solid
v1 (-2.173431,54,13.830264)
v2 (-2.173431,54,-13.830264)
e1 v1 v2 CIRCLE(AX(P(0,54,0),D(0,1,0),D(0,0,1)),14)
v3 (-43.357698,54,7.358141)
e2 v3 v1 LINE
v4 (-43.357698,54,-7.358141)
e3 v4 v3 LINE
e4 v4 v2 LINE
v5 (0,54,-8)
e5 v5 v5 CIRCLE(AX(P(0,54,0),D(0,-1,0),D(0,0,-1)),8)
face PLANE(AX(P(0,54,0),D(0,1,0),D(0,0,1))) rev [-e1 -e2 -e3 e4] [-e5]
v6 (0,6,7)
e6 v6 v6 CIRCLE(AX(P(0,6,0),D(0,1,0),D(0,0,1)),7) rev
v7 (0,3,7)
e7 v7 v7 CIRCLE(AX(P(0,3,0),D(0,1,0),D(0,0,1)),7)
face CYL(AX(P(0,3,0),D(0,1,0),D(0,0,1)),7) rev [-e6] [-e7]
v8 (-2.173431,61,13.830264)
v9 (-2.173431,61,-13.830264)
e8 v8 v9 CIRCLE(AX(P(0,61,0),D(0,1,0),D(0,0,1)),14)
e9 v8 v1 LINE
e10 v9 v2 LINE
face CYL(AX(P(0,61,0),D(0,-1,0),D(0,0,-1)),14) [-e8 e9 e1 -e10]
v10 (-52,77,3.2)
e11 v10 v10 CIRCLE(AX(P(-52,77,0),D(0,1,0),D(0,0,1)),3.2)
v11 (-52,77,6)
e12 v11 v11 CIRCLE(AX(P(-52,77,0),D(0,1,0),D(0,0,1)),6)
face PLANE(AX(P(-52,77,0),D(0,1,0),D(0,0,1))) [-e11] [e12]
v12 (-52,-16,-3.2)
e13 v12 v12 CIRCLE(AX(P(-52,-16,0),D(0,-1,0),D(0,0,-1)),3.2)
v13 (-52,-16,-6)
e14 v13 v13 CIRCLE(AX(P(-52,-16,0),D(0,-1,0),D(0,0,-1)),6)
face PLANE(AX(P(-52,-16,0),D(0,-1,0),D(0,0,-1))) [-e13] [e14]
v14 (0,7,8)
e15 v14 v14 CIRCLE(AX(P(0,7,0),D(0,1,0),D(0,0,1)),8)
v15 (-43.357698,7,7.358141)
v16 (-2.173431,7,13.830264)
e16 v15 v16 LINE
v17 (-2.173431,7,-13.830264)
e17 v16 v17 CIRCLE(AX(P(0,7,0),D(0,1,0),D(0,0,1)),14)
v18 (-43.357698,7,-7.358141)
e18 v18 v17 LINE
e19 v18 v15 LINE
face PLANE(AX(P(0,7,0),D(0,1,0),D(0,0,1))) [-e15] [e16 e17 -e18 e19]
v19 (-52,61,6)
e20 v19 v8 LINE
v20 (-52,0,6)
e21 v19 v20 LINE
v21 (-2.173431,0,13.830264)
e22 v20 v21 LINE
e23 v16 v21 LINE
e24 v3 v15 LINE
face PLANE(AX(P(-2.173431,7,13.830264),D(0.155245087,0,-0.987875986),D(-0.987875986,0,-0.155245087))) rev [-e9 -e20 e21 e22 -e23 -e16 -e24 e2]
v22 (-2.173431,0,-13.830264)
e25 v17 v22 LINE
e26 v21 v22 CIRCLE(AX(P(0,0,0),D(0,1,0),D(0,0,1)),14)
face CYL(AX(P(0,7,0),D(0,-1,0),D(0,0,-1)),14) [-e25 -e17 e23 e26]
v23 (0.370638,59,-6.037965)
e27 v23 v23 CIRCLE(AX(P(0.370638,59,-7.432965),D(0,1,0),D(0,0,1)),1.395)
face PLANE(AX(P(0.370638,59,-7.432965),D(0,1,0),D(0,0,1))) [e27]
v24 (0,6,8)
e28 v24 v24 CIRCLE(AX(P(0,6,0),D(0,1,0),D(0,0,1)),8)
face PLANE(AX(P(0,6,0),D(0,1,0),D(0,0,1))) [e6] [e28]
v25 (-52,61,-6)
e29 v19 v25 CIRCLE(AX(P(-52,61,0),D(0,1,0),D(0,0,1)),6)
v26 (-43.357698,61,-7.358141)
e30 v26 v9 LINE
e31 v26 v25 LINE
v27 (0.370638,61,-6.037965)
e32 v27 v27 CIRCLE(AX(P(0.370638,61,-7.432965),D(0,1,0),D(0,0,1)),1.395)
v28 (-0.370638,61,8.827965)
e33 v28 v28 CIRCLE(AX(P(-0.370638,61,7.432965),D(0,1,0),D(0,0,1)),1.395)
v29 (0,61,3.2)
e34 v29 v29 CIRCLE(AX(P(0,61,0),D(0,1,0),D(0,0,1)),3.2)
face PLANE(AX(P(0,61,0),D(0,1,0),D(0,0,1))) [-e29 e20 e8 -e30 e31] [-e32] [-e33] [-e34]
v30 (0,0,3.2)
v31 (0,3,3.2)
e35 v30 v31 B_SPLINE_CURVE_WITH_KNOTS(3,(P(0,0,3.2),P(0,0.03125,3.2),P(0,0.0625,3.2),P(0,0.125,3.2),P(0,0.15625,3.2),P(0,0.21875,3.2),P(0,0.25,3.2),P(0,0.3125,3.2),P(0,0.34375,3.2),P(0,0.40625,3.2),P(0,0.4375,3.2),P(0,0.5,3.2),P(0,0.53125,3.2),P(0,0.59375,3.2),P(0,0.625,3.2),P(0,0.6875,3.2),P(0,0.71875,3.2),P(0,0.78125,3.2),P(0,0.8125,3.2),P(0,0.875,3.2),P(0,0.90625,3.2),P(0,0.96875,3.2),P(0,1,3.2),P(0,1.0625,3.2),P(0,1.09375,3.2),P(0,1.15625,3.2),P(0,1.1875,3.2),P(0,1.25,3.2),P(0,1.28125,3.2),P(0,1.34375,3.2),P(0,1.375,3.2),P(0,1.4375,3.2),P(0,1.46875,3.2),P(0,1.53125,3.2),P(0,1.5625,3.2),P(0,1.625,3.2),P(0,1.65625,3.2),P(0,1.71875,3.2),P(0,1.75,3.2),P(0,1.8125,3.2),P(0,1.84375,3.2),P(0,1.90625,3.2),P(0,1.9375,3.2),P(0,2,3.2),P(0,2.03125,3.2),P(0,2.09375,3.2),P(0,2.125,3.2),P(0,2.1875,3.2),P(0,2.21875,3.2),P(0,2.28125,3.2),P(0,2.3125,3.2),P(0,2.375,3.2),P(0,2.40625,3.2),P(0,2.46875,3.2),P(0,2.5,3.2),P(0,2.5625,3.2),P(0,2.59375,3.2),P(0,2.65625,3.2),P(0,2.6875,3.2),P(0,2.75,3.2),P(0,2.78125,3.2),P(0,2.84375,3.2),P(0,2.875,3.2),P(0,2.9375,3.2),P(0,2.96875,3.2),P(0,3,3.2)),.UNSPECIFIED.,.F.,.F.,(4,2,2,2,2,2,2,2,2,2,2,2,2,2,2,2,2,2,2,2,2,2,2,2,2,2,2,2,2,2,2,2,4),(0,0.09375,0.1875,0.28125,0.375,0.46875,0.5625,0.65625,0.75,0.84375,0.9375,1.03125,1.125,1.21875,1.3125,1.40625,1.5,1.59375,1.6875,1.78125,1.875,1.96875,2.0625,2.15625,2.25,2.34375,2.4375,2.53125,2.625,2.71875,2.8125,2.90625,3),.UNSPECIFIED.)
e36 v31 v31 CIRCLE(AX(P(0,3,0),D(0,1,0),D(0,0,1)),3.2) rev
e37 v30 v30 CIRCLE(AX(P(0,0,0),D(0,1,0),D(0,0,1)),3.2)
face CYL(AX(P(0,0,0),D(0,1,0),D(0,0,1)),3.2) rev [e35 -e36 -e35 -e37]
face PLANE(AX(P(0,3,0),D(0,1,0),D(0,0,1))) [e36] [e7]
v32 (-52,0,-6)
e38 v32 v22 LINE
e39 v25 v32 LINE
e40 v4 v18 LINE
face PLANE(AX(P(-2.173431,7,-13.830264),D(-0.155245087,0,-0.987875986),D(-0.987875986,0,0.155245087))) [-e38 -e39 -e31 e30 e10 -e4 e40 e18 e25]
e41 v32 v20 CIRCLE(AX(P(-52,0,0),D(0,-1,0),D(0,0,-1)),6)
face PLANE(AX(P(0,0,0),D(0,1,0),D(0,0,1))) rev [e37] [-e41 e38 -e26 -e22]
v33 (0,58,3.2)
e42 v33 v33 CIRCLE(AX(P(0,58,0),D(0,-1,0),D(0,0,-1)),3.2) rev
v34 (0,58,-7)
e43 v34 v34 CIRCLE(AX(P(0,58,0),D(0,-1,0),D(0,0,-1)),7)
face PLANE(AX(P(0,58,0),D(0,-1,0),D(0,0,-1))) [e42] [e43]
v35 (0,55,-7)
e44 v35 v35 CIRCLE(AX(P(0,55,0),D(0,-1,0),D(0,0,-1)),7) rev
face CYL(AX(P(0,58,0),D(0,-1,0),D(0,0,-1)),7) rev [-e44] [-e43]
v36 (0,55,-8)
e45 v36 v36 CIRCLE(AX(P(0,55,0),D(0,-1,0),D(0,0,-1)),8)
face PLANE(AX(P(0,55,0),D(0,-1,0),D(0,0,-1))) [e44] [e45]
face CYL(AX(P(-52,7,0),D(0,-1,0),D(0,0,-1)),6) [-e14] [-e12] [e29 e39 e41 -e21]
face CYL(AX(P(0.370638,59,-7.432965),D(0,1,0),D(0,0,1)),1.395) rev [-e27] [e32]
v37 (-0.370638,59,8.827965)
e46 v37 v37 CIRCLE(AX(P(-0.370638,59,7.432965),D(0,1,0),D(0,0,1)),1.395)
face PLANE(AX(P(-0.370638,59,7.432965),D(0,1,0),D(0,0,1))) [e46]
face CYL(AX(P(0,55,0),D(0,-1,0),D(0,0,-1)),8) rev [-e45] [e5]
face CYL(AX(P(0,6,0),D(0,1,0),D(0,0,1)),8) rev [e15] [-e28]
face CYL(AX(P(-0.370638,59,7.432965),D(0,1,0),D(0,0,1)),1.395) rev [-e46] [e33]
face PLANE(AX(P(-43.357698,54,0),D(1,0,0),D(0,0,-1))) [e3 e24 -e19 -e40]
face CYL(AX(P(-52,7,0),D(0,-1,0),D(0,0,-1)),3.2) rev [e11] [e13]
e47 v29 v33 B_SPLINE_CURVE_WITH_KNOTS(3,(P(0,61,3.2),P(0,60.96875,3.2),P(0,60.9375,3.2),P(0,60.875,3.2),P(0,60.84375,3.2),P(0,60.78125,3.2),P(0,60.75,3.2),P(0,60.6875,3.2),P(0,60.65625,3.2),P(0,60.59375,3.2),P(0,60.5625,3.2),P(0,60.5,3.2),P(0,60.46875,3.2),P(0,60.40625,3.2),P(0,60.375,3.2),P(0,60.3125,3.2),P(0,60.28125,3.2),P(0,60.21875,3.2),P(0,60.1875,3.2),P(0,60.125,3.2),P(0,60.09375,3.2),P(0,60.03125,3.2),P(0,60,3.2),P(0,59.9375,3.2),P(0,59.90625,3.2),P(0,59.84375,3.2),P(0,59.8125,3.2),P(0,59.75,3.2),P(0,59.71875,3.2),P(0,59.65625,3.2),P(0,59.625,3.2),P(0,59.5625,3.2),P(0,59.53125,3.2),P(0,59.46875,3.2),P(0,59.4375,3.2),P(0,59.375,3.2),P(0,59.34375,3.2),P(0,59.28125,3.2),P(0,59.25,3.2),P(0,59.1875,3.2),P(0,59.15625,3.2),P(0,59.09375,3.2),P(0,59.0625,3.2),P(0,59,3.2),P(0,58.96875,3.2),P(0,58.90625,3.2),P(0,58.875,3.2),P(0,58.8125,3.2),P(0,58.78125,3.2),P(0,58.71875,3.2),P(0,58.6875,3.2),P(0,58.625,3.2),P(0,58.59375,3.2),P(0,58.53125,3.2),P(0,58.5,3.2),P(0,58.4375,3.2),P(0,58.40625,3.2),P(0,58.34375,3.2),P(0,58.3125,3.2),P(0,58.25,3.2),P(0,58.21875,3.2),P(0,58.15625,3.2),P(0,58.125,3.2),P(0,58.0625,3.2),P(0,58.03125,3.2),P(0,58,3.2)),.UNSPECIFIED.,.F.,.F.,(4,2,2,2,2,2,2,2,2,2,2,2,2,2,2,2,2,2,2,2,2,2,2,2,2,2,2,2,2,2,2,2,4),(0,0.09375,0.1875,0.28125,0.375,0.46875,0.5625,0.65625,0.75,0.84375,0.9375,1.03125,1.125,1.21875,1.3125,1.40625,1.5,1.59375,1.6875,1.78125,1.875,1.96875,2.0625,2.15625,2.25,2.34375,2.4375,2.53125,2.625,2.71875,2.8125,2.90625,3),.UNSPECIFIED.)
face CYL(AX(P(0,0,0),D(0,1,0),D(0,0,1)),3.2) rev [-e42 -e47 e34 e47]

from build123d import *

# Parameters (mm, degrees)
SKETCH1_R               = 3.2
BOSS_EXTRUDE1_DEPTH     = 7
SKETCH2_R               = 3.2
BOSS_EXTRUDE2_DEPTH     = 47
BOSS_EXTRUDE3_OUTLINE_R = 3.2
BOSS_EXTRUDE3_DEPTH     = 7
CUT_EXTRUDE1_DEPTH      = 86.32877599
CUT_EXTRUDE1_DEPTH_BACK = 86.32877599
SKETCH5_R               = 3.2
SKETCH6_R               = 1.395
CUT_EXTRUDE2_DEPTH      = 2
SKETCH7_R               = 7
CUT_EXTRUDE3_DEPTH      = 4
SKETCH8_R               = 8
CUT_EXTRUDE4_DEPTH      = 1
CUT_EXTRUDE5_START      = -4
SKETCH9_R               = 7
CUT_EXTRUDE5_DEPTH      = 4
CUT_EXTRUDE6_START      = -1
SKETCH10_R              = 8
CUT_EXTRUDE6_DEPTH      = 1
SKETCH11_R              = 6
SKETCH11_R_2            = 3.2
BOSS_EXTRUDE4_DEPTH     = 16
BOSS_EXTRUDE5_START     = 16
SKETCH12_R              = 6
SKETCH12_R_2            = 3.2
BOSS_EXTRUDE5_DEPTH     = 16


# Read off the part's stored shape, not the designer's step: Boss-Extrude3
with BuildPart() as part:
    # Sketch1 → Boss-Extrude1 (new body)
    with BuildSketch(Plane(origin=(0, 0, 0), x_dir=(1, 0, 0), z_dir=(0, 1, 0))):
        with BuildLine():
            ThreePointArc((-52, 6), (-58, 0), (-52, -6))
            Line((-52, -6), (-2.173431493, -13.830264184))
            ThreePointArc((-2.173431493, -13.830264184), (14.000000424, -1.65e-07), (-2.173431166, 13.830264236))
            Line((-2.173431166, 13.830264236), (-52, 6))
        make_face()
        with Locations(Location((-52, 0, 0), (0, 0, 270))):
            Circle(SKETCH1_R, mode=Mode.SUBTRACT)
    extrude(amount=BOSS_EXTRUDE1_DEPTH)

    # Sketch2 → Boss-Extrude2 (add)
    # profile 1 of 2: a face of its own
    with BuildSketch(Plane(origin=(0, 7, 0), x_dir=(1, 0, 0), z_dir=(0, 1, 0))):
        with BuildLine():
            ThreePointArc((-46, 0), (-47.757359313, 4.242640687), (-52, 6))
            ThreePointArc((-52, 6), (-58, 0), (-52, -6))
            ThreePointArc((-52, -6), (-47.757359313, -4.242640687), (-46, 0))
        make_face()
        with Locations(Location((-52, 0, 0), (0, 0, 270))):
            Circle(SKETCH2_R, mode=Mode.SUBTRACT)
    # profile 2 of 2: a face of its own
    with BuildSketch(Plane(origin=(0, 7, 0), x_dir=(1, 0, 0), z_dir=(0, 1, 0))):
        with BuildLine():
            Line((-43.357698304, -7.358140997), (-43.357698304, 7.358140997))
            Line((-43.357698304, 7.358140997), (-52, 6))
            ThreePointArc((-52, 6), (-47.757359313, 4.242640687), (-46, 0))
            ThreePointArc((-46, 0), (-47.757359313, -4.242640687), (-52, -6))
            Line((-52, -6), (-43.357698304, -7.358140997))
        make_face()
    extrude(amount=BOSS_EXTRUDE2_DEPTH)

    # Boss-Extrude3 outline → Boss-Extrude3 (add)
    with BuildSketch(Plane(origin=(0, 54, 0), x_dir=(1, 0, 0), z_dir=(0, 1, 0))):
        with BuildLine():
            ThreePointArc((-2.17343128, -13.830264218), (14.000000424, -1.07e-07), (-2.173431068, 13.830264251))
            Line((-2.173431068, 13.830264251), (-52, 6))
            ThreePointArc((-52, 6), (-58, 0), (-52, -6))
            Line((-52, -6), (-2.17343128, -13.830264218))
        make_face()
        with Locations((-52, 0)):
            Circle(BOSS_EXTRUDE3_OUTLINE_R, mode=Mode.SUBTRACT)
    extrude(amount=BOSS_EXTRUDE3_DEPTH)

    # Sketch5 → Cut-Extrude1 (cut, two sides: drawn at the far end of the back side and taken through both)
    with BuildSketch(Plane(origin=(0, 61, 0), x_dir=(1, 0, 0), z_dir=(0, 1, 0)).offset(-CUT_EXTRUDE1_DEPTH_BACK)):
        with Locations(Location((0, 0, 0), (0, 0, 270))):
            Circle(SKETCH5_R)
    extrude(amount=CUT_EXTRUDE1_DEPTH + CUT_EXTRUDE1_DEPTH_BACK, mode=Mode.SUBTRACT)

    # Sketch6 → Cut-Extrude2 (cut)
    with BuildSketch(Plane(origin=(0, 61, 0), x_dir=(1, 0, 0), z_dir=(0, 1, 0))):
        with Locations(Location((-0.370638007, -7.432964974, 0), (0, 0, 270))):
            Circle(SKETCH6_R)
        with Locations(Location((0.370638007, 7.432964974, 0), (0, 0, 270))):
            Circle(SKETCH6_R)
    extrude(amount=-CUT_EXTRUDE2_DEPTH, mode=Mode.SUBTRACT)

    # Sketch7 → Cut-Extrude3 (cut)
    with BuildSketch(Plane.XZ.offset(-54)):
        with Locations(Location((0, 0, 0), (0, 0, 270))):
            Circle(SKETCH7_R)
    extrude(amount=-CUT_EXTRUDE3_DEPTH, mode=Mode.SUBTRACT)

    # Sketch8 → Cut-Extrude4 (cut)
    with BuildSketch(Plane.XZ.offset(-54)):
        with Locations(Location((0, 0, 0), (0, 0, 270))):
            Circle(SKETCH8_R)
    extrude(amount=-CUT_EXTRUDE4_DEPTH, mode=Mode.SUBTRACT)

    # Sketch9 → Cut-Extrude5 (cut)
    with BuildSketch(Plane(origin=(0, 7, 0), x_dir=(1, 0, 0), z_dir=(0, 1, 0)).offset(CUT_EXTRUDE5_START)):
        with Locations(Location((0, 0, 0), (0, 0, 90))):
            Circle(SKETCH9_R)
    extrude(amount=CUT_EXTRUDE5_DEPTH, mode=Mode.SUBTRACT)

    # Sketch10 → Cut-Extrude6 (cut)
    with BuildSketch(Plane(origin=(0, 7, 0), x_dir=(1, 0, 0), z_dir=(0, 1, 0)).offset(CUT_EXTRUDE6_START)):
        with Locations(Location((0, 0, 0), (0, 0, 90))):
            Circle(SKETCH10_R)
    extrude(amount=CUT_EXTRUDE6_DEPTH, mode=Mode.SUBTRACT)

    # Sketch11 → Boss-Extrude4 (add)
    with BuildSketch(Plane(origin=(0, 61, 0), x_dir=(1, 0, 0), z_dir=(0, 1, 0))):
        with Locations(Location((-52, 0, 0), (0, 0, 270))):
            Circle(SKETCH11_R)
        with Locations(Location((-52, 0, 0), (0, 0, 270))):
            Circle(SKETCH11_R_2, mode=Mode.SUBTRACT)
    extrude(amount=BOSS_EXTRUDE4_DEPTH)

    # Sketch12 → Boss-Extrude5 (add)
    with BuildSketch(Plane.XZ.offset(BOSS_EXTRUDE5_START)):
        with Locations(Location((-52, 0, 0), (0, 0, 270))):
            Circle(SKETCH12_R)
        with Locations(Location((-52, 0, 0), (0, 0, 270))):
            Circle(SKETCH12_R_2, mode=Mode.SUBTRACT)
    extrude(amount=-BOSS_EXTRUDE5_DEPTH)


solid = part.part
